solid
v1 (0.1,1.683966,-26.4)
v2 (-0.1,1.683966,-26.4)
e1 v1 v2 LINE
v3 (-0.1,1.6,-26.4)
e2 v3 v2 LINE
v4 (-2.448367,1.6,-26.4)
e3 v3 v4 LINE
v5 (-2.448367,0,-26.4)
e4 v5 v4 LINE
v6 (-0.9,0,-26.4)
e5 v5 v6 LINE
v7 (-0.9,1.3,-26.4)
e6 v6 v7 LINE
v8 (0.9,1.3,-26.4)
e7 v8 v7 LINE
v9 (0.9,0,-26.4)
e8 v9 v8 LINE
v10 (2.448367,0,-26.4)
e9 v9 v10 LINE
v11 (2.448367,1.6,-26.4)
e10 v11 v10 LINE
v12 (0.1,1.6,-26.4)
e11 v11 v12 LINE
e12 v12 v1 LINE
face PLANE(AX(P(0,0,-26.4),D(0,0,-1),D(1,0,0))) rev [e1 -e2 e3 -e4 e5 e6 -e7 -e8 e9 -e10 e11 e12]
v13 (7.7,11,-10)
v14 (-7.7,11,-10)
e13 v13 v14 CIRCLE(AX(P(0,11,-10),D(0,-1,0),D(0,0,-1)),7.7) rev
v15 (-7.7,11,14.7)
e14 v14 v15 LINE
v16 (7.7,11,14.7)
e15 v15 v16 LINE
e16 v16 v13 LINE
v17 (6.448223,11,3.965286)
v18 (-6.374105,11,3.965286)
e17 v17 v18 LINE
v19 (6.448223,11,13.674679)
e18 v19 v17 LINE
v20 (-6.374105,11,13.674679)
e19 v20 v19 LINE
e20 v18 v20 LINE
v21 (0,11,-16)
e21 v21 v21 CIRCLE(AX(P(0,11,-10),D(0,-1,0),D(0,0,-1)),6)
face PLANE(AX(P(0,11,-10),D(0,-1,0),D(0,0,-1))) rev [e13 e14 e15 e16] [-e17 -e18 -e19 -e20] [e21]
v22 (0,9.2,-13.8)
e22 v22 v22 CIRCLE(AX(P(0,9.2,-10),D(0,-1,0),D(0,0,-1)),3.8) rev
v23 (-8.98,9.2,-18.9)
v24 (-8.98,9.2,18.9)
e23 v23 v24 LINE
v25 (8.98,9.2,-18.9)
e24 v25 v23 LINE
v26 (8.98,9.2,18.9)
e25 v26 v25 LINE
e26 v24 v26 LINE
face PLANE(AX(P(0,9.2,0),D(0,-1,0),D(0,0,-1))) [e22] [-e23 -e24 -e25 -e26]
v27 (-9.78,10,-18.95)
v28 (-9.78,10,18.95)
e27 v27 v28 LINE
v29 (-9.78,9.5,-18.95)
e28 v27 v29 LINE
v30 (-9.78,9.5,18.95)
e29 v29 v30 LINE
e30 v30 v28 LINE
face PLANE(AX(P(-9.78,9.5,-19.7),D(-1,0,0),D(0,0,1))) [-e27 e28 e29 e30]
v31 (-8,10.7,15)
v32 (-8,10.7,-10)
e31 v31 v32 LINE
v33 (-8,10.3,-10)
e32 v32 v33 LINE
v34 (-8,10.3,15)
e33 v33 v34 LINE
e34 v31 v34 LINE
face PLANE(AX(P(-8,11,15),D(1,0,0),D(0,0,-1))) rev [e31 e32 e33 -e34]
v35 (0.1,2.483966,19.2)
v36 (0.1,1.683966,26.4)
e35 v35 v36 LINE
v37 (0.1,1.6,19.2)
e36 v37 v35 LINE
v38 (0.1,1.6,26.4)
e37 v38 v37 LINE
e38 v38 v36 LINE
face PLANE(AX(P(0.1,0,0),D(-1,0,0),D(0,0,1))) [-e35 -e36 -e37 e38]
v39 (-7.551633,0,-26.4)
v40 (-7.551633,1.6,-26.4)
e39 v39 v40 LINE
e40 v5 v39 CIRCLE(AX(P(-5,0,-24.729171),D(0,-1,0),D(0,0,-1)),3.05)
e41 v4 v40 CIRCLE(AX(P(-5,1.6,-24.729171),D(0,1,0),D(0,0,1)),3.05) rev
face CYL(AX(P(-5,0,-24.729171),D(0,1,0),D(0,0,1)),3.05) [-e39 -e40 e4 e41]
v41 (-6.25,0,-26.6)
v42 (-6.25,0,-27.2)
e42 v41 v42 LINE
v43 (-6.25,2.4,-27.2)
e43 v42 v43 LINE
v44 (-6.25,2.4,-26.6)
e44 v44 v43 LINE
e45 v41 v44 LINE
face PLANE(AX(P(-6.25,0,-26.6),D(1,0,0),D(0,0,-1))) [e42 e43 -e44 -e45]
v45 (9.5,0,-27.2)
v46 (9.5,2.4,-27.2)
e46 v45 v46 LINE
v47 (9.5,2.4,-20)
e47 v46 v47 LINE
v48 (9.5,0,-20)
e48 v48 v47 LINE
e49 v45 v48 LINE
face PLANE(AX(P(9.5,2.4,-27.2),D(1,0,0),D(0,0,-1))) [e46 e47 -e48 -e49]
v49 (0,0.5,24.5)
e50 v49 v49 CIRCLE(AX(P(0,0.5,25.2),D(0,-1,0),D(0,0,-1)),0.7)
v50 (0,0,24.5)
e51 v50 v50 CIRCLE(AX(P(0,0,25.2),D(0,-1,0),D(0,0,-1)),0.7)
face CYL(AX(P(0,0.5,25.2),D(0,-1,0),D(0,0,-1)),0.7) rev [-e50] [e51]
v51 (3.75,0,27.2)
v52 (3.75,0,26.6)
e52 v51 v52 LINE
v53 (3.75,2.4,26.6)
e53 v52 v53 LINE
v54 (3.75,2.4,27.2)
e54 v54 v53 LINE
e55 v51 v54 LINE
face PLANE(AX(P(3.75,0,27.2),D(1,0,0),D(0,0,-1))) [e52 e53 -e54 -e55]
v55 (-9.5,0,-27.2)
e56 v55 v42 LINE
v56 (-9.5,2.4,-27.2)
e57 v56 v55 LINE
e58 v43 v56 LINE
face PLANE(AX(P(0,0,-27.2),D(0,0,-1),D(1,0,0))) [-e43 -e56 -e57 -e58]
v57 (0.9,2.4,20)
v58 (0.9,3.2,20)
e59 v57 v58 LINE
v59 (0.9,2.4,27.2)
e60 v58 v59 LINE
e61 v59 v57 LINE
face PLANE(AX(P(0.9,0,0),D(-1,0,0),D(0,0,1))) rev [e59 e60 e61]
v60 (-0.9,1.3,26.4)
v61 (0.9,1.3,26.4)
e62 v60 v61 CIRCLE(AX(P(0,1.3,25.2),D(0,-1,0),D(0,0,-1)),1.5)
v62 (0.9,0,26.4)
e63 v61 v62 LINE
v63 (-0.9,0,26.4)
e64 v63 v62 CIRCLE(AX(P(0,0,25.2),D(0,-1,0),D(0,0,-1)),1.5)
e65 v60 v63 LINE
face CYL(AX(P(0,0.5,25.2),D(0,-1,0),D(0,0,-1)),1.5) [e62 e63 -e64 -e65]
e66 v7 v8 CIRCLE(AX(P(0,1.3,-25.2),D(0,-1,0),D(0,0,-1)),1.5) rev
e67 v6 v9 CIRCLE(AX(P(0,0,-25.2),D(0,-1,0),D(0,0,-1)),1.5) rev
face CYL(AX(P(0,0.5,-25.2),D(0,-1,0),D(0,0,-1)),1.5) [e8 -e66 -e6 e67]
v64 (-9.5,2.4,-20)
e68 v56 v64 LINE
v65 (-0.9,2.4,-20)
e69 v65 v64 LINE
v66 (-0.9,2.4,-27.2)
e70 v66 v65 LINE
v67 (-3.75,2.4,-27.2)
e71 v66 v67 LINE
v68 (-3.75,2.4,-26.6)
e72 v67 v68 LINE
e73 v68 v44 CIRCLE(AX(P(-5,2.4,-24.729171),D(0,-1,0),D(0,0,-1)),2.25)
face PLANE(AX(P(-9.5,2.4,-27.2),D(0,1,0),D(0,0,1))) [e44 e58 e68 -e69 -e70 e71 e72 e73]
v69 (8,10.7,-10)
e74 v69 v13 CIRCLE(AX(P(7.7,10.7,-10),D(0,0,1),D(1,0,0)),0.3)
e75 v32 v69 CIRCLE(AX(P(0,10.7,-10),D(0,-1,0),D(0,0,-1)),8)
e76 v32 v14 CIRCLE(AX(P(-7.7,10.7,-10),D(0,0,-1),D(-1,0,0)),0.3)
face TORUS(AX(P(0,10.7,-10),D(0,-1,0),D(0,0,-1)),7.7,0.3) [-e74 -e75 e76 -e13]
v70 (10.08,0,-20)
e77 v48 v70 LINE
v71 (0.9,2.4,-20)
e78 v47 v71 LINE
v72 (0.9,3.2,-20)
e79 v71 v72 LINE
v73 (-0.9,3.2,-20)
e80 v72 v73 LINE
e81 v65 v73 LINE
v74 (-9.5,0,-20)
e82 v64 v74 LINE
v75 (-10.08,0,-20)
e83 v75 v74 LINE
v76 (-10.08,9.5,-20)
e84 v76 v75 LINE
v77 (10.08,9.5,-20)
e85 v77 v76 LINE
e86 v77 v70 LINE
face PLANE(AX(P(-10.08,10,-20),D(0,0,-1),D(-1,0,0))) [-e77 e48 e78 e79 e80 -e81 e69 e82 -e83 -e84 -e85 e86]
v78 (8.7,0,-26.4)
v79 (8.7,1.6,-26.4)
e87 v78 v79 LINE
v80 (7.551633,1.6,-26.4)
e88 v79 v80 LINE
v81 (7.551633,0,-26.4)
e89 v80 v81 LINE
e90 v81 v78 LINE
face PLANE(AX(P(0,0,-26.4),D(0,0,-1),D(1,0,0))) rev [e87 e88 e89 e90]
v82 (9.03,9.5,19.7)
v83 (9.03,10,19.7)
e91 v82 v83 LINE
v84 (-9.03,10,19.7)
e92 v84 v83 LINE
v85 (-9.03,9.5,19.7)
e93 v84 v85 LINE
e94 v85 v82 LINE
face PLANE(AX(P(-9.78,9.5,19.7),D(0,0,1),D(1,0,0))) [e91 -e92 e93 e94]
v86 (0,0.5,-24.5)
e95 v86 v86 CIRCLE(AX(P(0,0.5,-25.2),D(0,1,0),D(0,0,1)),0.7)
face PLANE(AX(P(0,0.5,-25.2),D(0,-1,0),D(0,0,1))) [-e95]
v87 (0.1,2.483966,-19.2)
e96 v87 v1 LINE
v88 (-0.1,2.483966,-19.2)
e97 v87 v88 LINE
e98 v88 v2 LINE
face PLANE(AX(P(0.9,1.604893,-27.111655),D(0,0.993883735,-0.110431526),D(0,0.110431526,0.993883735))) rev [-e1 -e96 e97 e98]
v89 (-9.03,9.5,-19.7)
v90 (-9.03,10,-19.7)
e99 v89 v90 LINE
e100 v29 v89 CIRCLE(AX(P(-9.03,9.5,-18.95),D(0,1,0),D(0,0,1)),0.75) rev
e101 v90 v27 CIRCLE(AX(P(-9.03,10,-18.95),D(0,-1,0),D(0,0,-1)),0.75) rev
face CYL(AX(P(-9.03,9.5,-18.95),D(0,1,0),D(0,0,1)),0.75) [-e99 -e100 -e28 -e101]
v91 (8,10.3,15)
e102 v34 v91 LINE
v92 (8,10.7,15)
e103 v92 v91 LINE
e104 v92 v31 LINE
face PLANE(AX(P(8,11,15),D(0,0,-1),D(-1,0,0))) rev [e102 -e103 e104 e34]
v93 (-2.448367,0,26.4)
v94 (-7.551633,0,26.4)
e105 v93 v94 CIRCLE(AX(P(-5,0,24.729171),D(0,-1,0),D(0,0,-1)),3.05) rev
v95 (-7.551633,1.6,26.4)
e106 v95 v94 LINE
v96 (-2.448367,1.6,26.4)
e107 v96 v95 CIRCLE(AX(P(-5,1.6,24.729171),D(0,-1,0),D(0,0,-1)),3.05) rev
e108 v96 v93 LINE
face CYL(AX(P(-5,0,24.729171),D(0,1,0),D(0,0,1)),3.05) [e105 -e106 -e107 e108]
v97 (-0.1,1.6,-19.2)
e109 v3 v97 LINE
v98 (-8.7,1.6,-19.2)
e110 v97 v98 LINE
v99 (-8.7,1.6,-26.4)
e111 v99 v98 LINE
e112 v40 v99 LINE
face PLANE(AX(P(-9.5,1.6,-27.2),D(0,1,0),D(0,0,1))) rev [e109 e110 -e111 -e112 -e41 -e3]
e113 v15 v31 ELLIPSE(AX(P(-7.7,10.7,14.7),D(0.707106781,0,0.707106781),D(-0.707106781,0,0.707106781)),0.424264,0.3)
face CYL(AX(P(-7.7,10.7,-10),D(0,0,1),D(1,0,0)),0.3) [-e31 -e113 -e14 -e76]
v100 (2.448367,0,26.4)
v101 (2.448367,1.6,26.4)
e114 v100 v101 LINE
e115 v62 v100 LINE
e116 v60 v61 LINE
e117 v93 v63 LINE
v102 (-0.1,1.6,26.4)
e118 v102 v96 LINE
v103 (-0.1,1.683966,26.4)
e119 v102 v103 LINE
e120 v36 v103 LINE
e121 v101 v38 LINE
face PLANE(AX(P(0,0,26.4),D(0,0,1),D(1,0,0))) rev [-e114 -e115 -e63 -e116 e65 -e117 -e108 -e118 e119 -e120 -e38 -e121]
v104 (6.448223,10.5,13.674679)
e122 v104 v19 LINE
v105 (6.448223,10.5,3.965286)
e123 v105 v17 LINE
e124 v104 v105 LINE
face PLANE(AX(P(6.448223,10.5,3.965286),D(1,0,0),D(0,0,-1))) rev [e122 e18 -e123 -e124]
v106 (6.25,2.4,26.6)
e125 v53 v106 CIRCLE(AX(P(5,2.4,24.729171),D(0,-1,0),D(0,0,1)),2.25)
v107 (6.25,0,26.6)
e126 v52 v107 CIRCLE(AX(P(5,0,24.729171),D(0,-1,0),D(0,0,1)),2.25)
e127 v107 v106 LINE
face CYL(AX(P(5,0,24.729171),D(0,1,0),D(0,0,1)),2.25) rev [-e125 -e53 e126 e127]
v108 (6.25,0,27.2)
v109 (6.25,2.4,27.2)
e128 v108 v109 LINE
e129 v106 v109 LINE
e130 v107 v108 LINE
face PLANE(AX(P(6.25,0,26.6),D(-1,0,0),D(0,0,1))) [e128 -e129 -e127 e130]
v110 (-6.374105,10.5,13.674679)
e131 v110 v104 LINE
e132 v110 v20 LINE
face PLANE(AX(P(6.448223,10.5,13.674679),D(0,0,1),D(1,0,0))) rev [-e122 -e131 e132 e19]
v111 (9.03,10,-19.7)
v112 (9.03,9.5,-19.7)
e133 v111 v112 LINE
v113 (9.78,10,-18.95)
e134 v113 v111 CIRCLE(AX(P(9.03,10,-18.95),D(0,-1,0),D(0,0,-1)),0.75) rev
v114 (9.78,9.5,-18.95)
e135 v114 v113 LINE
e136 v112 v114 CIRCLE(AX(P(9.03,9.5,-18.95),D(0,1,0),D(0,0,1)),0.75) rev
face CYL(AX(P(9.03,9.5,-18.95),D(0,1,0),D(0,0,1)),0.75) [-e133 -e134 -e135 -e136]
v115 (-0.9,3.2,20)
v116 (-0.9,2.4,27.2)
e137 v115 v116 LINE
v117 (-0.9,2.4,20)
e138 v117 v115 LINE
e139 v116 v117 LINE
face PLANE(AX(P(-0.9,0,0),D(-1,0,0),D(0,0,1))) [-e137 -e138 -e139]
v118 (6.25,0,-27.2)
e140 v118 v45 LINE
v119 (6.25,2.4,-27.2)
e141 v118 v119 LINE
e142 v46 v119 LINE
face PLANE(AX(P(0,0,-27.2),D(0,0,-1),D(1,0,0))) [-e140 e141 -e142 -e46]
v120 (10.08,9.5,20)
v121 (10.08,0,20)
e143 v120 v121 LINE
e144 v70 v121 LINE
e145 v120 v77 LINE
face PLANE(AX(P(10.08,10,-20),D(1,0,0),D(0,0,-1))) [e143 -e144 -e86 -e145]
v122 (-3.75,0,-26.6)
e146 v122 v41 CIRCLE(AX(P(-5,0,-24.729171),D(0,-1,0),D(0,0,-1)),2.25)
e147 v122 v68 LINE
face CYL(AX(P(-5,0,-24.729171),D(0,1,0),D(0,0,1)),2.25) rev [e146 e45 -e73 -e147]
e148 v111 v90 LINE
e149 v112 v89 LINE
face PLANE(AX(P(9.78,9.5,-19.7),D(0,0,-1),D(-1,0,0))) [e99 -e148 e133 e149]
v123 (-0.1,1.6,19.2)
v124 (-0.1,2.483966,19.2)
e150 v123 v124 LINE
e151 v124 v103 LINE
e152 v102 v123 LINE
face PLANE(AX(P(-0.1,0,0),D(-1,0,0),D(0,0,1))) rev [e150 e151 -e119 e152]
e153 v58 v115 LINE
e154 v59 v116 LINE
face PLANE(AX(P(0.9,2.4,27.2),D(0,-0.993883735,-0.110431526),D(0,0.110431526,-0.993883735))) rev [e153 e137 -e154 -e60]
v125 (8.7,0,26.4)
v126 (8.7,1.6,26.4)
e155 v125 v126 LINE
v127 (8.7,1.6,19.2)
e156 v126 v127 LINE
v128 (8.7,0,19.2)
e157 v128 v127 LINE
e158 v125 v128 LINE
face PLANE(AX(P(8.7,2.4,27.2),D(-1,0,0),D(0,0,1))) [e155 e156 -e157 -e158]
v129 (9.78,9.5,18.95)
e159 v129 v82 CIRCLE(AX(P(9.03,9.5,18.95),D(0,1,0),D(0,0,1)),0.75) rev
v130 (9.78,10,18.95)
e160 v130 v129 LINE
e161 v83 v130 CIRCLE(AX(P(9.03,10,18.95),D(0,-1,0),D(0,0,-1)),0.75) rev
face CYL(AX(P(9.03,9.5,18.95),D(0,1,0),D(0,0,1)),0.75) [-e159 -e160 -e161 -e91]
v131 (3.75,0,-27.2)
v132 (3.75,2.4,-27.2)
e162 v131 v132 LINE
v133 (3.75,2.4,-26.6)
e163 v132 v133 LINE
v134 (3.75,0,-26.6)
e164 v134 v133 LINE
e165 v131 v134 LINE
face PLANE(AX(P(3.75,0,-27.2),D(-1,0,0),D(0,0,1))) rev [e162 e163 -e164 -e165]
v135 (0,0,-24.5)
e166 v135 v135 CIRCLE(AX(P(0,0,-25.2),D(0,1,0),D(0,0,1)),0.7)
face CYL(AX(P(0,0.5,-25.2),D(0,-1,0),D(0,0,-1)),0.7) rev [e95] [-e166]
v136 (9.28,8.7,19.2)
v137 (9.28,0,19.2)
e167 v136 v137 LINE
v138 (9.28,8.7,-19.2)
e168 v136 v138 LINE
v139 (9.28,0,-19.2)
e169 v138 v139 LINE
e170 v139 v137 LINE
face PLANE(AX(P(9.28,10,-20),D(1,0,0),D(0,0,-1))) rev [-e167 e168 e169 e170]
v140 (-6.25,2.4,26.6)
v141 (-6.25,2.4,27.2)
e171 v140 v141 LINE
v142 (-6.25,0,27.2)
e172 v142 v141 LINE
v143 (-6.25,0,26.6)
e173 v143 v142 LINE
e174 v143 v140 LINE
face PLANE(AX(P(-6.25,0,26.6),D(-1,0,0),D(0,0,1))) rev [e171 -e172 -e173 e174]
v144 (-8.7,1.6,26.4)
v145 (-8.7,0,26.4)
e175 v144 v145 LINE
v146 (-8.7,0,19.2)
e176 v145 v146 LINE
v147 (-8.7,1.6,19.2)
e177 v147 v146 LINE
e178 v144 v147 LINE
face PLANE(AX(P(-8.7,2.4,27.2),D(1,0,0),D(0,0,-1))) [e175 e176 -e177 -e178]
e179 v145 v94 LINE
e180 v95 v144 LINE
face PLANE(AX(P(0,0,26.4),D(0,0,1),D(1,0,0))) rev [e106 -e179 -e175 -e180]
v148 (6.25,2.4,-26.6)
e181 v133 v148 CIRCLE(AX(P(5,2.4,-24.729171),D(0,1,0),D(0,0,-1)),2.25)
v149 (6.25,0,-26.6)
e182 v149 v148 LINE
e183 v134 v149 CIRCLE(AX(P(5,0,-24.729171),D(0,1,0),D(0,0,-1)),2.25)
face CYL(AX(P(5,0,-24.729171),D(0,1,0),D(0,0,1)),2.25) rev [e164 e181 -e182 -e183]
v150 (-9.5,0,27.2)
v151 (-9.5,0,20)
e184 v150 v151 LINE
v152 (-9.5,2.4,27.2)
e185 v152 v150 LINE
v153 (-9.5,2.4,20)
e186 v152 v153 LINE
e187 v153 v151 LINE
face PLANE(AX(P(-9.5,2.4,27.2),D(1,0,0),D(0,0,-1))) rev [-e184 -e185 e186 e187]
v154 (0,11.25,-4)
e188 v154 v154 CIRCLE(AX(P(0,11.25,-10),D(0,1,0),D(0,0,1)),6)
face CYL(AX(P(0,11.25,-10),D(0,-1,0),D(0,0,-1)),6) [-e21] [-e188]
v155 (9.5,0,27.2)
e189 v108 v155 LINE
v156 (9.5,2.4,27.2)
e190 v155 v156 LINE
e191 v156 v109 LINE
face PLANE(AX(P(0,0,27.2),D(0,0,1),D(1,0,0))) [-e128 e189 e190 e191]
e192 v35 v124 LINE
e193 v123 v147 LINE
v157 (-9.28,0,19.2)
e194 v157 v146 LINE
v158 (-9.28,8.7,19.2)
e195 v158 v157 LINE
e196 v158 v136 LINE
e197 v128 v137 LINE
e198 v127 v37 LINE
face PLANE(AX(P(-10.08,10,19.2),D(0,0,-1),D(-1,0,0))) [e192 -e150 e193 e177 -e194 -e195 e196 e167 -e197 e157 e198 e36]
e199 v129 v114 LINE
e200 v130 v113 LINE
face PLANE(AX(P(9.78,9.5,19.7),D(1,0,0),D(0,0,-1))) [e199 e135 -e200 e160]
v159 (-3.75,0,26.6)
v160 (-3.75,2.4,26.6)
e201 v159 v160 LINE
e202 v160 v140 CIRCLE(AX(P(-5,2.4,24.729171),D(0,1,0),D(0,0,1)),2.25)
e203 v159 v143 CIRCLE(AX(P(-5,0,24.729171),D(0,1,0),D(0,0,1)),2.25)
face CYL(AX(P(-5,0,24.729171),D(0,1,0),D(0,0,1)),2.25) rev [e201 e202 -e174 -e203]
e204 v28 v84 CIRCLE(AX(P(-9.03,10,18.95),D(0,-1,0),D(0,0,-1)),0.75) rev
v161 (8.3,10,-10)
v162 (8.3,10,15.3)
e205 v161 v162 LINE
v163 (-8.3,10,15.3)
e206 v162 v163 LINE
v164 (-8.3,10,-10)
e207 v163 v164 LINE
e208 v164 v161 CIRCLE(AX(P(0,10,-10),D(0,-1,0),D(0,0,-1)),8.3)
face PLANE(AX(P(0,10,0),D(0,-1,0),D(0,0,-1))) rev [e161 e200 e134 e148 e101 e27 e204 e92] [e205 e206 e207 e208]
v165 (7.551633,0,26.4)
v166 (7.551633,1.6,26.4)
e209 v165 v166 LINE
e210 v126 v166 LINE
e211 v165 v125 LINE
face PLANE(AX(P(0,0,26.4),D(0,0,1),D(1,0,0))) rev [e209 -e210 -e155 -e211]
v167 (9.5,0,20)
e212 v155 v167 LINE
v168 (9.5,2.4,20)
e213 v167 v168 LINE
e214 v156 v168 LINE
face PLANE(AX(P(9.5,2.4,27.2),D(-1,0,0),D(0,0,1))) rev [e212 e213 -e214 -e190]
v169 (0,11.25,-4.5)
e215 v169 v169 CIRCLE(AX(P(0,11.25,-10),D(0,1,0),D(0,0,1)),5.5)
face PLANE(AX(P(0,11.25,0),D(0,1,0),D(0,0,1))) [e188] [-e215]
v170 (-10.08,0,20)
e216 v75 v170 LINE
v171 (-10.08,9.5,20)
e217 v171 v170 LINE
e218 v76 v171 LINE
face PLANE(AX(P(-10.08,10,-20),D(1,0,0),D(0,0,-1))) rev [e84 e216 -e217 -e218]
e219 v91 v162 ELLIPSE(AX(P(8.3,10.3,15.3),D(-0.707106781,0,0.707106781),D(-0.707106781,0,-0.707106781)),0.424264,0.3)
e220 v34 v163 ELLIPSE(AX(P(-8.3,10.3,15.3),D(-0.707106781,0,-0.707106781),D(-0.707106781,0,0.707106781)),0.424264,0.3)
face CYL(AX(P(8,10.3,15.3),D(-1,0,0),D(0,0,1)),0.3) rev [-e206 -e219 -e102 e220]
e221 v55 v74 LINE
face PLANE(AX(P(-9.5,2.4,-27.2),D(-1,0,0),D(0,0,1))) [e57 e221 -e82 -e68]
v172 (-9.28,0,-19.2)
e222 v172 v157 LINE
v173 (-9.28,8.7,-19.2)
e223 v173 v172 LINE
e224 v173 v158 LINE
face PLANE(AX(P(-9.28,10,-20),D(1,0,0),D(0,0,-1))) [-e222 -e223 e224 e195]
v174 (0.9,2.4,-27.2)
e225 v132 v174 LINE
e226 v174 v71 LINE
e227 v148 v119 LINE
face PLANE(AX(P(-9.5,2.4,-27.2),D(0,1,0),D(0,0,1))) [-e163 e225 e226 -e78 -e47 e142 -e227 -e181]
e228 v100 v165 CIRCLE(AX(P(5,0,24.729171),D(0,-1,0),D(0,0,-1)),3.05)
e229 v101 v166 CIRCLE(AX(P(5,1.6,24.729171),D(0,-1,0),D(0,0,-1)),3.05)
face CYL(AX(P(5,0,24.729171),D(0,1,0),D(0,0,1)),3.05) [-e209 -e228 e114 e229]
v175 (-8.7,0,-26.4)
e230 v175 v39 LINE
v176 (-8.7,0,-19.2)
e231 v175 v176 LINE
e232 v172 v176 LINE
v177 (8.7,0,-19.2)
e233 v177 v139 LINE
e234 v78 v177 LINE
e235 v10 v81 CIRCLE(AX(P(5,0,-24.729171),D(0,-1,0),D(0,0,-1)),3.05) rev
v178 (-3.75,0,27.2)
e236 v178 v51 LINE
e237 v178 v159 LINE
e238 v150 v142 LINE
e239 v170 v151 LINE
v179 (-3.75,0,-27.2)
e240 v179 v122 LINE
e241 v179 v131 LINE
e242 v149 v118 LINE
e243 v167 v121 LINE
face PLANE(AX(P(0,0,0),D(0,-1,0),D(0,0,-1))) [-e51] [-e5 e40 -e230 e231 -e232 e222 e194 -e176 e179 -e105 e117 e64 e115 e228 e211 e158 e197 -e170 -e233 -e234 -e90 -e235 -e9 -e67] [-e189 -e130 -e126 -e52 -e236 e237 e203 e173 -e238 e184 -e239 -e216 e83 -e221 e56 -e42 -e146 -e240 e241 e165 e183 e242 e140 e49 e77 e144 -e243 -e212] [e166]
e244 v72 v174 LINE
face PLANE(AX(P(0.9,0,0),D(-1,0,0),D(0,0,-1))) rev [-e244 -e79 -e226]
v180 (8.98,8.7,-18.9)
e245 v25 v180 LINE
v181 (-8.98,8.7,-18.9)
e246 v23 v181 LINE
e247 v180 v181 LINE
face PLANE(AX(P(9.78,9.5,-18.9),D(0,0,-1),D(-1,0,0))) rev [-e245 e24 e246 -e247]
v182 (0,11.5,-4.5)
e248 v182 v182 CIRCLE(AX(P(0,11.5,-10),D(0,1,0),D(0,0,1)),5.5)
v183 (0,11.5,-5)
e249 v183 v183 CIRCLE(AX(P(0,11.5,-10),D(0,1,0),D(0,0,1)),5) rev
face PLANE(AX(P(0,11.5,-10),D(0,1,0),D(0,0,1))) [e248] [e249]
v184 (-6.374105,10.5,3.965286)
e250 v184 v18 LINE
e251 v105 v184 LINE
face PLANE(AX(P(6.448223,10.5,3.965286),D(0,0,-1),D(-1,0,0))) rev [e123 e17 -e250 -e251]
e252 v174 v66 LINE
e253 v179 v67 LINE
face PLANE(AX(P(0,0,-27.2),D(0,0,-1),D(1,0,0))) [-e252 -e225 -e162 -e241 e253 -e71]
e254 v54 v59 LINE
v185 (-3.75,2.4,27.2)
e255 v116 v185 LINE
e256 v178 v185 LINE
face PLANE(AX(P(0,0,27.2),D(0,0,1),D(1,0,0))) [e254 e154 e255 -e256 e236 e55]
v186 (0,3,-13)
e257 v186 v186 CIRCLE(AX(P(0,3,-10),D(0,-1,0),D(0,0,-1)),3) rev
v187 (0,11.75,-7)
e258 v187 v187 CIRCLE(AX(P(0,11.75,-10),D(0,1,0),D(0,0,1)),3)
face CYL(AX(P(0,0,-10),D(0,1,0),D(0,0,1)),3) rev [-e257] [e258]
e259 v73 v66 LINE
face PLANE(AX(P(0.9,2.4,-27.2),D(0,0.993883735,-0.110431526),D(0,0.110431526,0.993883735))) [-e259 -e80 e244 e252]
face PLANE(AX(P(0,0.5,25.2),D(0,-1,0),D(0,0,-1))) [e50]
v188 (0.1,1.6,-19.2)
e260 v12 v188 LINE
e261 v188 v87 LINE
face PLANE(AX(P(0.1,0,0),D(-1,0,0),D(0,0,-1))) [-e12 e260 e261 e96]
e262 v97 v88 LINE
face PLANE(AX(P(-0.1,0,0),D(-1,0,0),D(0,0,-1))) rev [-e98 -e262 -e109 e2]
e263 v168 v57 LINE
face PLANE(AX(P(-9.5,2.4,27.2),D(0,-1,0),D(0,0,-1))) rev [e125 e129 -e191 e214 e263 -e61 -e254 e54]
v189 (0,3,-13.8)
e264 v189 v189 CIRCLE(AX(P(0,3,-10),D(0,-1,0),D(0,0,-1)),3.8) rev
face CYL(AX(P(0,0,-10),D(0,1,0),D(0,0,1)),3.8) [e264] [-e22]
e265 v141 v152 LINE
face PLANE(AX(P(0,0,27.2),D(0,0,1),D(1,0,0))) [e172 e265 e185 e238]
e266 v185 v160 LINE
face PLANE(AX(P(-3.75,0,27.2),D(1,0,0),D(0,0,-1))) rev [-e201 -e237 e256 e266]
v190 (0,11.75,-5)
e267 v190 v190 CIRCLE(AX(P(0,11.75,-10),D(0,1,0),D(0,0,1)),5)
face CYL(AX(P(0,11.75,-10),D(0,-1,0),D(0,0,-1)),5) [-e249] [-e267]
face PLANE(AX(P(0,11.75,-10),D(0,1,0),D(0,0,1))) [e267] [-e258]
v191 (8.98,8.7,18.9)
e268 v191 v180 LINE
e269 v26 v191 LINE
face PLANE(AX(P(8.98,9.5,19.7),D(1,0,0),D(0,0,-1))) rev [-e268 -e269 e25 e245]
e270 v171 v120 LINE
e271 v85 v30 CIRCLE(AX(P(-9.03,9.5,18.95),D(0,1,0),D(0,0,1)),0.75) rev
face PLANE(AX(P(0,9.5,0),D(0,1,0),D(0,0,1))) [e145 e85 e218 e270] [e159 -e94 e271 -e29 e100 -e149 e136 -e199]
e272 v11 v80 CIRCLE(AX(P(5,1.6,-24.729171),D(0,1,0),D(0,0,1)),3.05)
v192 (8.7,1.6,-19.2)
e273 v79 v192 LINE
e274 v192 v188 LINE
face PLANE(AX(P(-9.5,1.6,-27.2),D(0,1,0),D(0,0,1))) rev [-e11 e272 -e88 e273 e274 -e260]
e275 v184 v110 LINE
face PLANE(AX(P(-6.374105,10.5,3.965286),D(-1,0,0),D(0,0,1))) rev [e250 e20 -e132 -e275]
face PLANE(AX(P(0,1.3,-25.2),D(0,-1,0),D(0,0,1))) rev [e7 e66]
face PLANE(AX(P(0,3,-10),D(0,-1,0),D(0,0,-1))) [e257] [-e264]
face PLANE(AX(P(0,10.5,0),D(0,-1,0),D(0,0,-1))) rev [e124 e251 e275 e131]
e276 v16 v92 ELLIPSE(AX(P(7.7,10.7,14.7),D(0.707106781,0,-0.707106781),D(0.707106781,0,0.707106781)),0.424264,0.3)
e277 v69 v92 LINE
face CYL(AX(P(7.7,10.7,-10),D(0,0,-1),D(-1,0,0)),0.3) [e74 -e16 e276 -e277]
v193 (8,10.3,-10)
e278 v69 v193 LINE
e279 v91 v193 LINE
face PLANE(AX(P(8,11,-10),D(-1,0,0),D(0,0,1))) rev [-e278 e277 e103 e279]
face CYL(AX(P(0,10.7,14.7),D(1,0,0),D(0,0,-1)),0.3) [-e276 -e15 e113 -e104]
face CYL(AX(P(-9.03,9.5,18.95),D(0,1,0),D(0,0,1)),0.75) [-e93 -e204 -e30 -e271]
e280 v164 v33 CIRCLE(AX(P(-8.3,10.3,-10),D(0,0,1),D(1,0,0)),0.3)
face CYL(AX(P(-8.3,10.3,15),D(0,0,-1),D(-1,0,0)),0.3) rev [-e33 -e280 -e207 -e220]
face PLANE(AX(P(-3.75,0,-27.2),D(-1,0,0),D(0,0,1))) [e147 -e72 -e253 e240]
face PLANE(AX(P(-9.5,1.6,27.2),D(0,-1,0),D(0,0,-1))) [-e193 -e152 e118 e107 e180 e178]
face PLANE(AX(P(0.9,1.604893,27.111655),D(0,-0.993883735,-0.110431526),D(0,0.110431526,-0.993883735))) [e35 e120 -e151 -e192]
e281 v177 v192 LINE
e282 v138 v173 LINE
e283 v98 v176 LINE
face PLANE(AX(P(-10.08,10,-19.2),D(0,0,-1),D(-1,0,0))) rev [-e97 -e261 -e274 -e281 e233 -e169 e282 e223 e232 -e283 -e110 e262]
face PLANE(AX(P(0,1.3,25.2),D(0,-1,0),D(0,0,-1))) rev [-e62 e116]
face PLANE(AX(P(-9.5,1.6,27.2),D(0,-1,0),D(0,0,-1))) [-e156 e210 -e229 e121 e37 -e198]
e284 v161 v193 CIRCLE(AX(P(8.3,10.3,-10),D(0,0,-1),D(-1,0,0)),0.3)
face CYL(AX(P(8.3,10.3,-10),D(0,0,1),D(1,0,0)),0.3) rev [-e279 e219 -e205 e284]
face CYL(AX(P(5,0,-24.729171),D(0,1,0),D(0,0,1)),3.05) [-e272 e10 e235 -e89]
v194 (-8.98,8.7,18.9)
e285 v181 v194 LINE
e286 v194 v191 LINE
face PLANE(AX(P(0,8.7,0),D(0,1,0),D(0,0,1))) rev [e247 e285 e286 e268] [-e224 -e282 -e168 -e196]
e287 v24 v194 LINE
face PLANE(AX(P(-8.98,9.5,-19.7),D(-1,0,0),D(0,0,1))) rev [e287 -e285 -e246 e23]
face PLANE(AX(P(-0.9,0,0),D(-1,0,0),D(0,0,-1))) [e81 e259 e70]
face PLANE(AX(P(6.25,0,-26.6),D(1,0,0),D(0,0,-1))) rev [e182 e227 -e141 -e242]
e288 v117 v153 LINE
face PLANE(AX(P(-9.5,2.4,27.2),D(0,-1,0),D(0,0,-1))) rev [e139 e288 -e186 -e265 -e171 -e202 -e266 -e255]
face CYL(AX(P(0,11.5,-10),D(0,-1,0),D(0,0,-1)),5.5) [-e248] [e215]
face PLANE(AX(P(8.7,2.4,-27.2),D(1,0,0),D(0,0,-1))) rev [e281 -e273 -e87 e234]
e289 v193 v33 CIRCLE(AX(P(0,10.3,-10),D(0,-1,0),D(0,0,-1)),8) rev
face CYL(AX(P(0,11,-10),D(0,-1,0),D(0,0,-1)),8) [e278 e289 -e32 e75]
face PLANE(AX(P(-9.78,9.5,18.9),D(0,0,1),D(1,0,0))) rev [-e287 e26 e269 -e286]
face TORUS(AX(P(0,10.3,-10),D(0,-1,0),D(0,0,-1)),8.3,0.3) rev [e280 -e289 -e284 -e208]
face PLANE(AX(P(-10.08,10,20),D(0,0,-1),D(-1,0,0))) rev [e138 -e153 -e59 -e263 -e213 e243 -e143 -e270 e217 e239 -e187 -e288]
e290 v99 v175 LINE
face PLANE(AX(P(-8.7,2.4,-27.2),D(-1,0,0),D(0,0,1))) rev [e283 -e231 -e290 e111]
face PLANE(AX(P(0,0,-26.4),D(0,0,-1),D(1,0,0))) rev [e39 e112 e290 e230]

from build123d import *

# Parameters (mm, degrees)
BASES_W                              = 20.16
BASES_H                              = 40
BASE_DEPTH                           = 10
SHAFTHOLES_R                         = 3
SHAFT_HOLE_DEPTH                     = 25.527666012
MOUNTINGTABS_W                       = 19
MOUNTINGTABS_H                       = 2.4
MOUNTING_TAB_DEPTH                   = 7.2
MOUNTING_HOLE_DEPTH                  = 30.986770416
BOTTOMALIGNHOLES_R                   = 0.7
BOTTOM_ALIGN_HOLE_DEPTH              = 0.5
TRIANGULAR_TAB_DEPTH                 = 0.9
MOUNTING_TAB_FEATURES_M_COPY_1_DEPTH = 30.986770416
BORDERCUTS_W                         = 20.16
BORDERCUTS_H                         = 40
BORDERCUTS_W_2                       = 19.56
BORDERCUTS_H_2                       = 39.4
BORDER_CUT_DEPTH                     = 0.5
BORDER_CUT_F_R                       = 0.75
SHELL3_OUTLINE_W                     = 17.96
SHELL3_OUTLINE_H                     = 37.8
SHELL3_OUTLINE_R                     = 3.8
SHELL3_DEPTH                         = 9.2
SHELL3_2_OUTLINE_W                   = 18.56
SHELL3_2_OUTLINE_H                   = 38.4
SHELL3_2_OUTLINE_W_2                 = 17.96
SHELL3_2_OUTLINE_H_2                 = 37.8
SHELL3_2_DEPTH                       = 8.7
SHELL3_3_DEPTH                       = 1.6
SHELL3_START                         = 1.3
SHELL3_4_DEPTH                       = 0.3
SHELL3_START_2                       = 1.6
SHELL3_5_OUTLINE_W                   = 0.2
SHELL3_5_OUTLINE_H                   = 7.2
SHELL3_5_DEPTH                       = 0.083965765
SHELL3_START_3                       = -0.1
SHELL3_6_DEPTH                       = 0.2
SKETCH2_R                            = 4.5
CUT_EXTRUDE1_DEPTH                   = 3
SKETCH3_R                            = 6
SKETCH3_R_2                          = 5.5
BOSS_EXTRUDE1_DEPTH                  = 1.25
SKETCH3_4_R                          = 5.5
BOSS_EXTRUDE2_DEPTH                  = 1.5
SKETCH3_5_R                          = 5
BOSS_EXTRUDE3_DEPTH                  = 1.75
CUT_EXTRUDE7_DEPTH                   = 31.68299855
CUT_EXTRUDE7_DEPTH_BACK              = 31.68299855
SKETCH3_6_R                          = 3
BOSS_EXTRUDE4_DEPTH                  = 1
SKETCH6_R                            = 3
CUT_EXTRUDE8_DEPTH                   = 20
SKETCH7_W                            = 12.822327898
SKETCH7_H                            = 9.709392801
CUT_EXTRUDE9_DEPTH                   = 0.5
FILLET2_R                            = 0.3


with BuildPart() as part:
    # BaseS → BASE (new body)
    with BuildSketch(Plane(origin=(0, 0, 0), x_dir=(1, 0, 0), z_dir=(0, 1, 0))):
        Rectangle(BASES_W, BASES_H)
    extrude(amount=BASE_DEPTH)

    # ShaftHoleS → SHAFT HOLE (cut, through all)
    with BuildSketch(Plane(origin=(0, 10, 0), x_dir=(1, 0, 0), z_dir=(0, 1, 0))):
        with Locations(Location((0, 10, 0), (0, 0, 270))):
            Circle(SHAFTHOLES_R)
    extrude(amount=-SHAFT_HOLE_DEPTH, mode=Mode.SUBTRACT)

    # MountingTabS → MOUNTING TAB (add)
    with BuildSketch(Plane.XY.offset(20)):
        with Locations((0, 1.2)):
            Rectangle(MOUNTINGTABS_W, MOUNTINGTABS_H)
    mounting_tab = extrude(amount=MOUNTING_TAB_DEPTH)

    # MountingHoleS → MOUNTING HOLE (cut, through all)
    with BuildSketch(Plane(origin=(0, 2.4, 0), x_dir=(1, 0, 0), z_dir=(0, 1, 0))):
        with BuildLine():
            Line((-6.25, -26.6), (-6.25, -27.2))
            Line((-6.25, -27.2), (-3.75, -27.2))
            Line((-3.75, -27.2), (-3.75, -26.6))
            ThreePointArc((-3.75, -26.6), (-5, -22.479171307), (-6.25, -26.6))
        make_face()
    mounting_hole = extrude(amount=-MOUNTING_HOLE_DEPTH, mode=Mode.SUBTRACT)

    # MH M: MOUNTING HOLE across plane
    add(mounting_hole.mirror(Plane(origin=(0, 0, 0), x_dir=(0, 0, 1), z_dir=(1, 0, 0))), mode=Mode.SUBTRACT)

    # BottomAlignHoleS → BOTTOM ALIGN HOLE (cut)
    with BuildSketch(Plane.XZ):
        with Locations(Location((0, 25.2, 0), (0, 0, 270))):
            Circle(BOTTOMALIGNHOLES_R)
    bottom_align_hole = extrude(amount=-BOTTOM_ALIGN_HOLE_DEPTH, mode=Mode.SUBTRACT)

    # TriangularTabS → TRIANGULAR TAB (add, symmetric)
    with BuildSketch(Plane(origin=(0, 0, 0), x_dir=(0, 0, -1), z_dir=(1, 0, 0))):
        Polygon((-20, 2.4), (-27.2, 2.4), (-20, 3.2), align=None)
    triangular_tab = extrude(amount=TRIANGULAR_TAB_DEPTH, both=True)

    # MOUNTING TAB FEATURES M: MOUNTING TAB, MOUNTING HOLE, BOTTOM ALIGN HOLE, TRIANGULAR TAB across plane
    add(mounting_tab.mirror(Plane.XY))
    add(mounting_hole.mirror(Plane.XY), mode=Mode.SUBTRACT)
    add(bottom_align_hole.mirror(Plane.XY), mode=Mode.SUBTRACT)
    add(triangular_tab.mirror(Plane.XY))

    # MOUNTING TAB FEATURES M copy 1 sketch → MOUNTING TAB FEATURES M copy 1 (cut, through all)
    with BuildSketch(Plane(origin=(0, 2.4, 0), x_dir=(-1, 0, 0), z_dir=(0, 1, 0))):
        with BuildLine():
            Line((-6.25, -26.6), (-6.25, -27.2))
            Line((-6.25, -27.2), (-3.75, -27.2))
            Line((-3.75, -27.2), (-3.75, -26.6))
            ThreePointArc((-3.75, -26.6), (-5, -22.479171307), (-6.25, -26.6))
        make_face()
    extrude(amount=-MOUNTING_TAB_FEATURES_M_COPY_1_DEPTH, mode=Mode.SUBTRACT)

    # BorderCutS → BORDER CUT (cut)
    with BuildSketch(Plane(origin=(0, 10, 0), x_dir=(1, 0, 0), z_dir=(0, 1, 0))):
        Rectangle(BORDERCUTS_W, BORDERCUTS_H)
        Rectangle(BORDERCUTS_W_2, BORDERCUTS_H_2, mode=Mode.SUBTRACT)
    extrude(amount=-BORDER_CUT_DEPTH, mode=Mode.SUBTRACT)

    # BORDER CUT F
    border_cut_f_edges = [part.edges().sort_by_distance(p)[0] for p in [
        (9.78, 9.75, -19.7),
        (9.78, 9.75, 19.7),
        (-9.78, 9.75, 19.7),
        (-9.78, 9.75, -19.7),
    ]]
    fillet(border_cut_f_edges, radius=BORDER_CUT_F_R)

    # Shell3: read off the stored shape, not the designer's step
    # Shell3 outline → Shell3 (cut)
    with BuildSketch(Plane(origin=(0, 0, 0), x_dir=(1, 0, 0), z_dir=(0, 1, 0))):
        Rectangle(SHELL3_OUTLINE_W, SHELL3_OUTLINE_H)
        with Locations((0, 10)):
            Circle(SHELL3_OUTLINE_R, mode=Mode.SUBTRACT)
    extrude(amount=SHELL3_DEPTH, mode=Mode.SUBTRACT)

    # Shell3 2 outline → Shell3 2 (cut)
    with BuildSketch(Plane(origin=(0, 0, 0), x_dir=(1, 0, 0), z_dir=(0, 1, 0))):
        Rectangle(SHELL3_2_OUTLINE_W, SHELL3_2_OUTLINE_H)
        Rectangle(SHELL3_2_OUTLINE_W_2, SHELL3_2_OUTLINE_H_2, mode=Mode.SUBTRACT)
    extrude(amount=SHELL3_2_DEPTH, mode=Mode.SUBTRACT)

    # Shell3 3 outline → Shell3 3 (cut)
    with BuildSketch(Plane(origin=(0, 0, 0), x_dir=(1, 0, 0), z_dir=(0, 1, 0))):
        with BuildLine():
            Line((8.7, 19.2), (8.7, 26.4))
            Line((8.7, 26.4), (7.5516331, 26.4))
            ThreePointArc((7.5516331, 26.4), (5, 21.679171307), (2.4483669, 26.4))
            Line((2.4483669, 26.4), (0.9, 26.4))
            ThreePointArc((0.9, 26.4), (0, 23.7), (-0.9, 26.4))
            Line((-0.9, 26.4), (-2.4483669, 26.4))
            ThreePointArc((-2.4483669, 26.4), (-5, 21.679171307), (-7.5516331, 26.4))
            Line((-7.5516331, 26.4), (-8.7, 26.4))
            Line((-8.7, 26.4), (-8.7, 19.2))
            Line((-8.7, 19.2), (8.7, 19.2))
        make_face()
        with BuildLine():
            Line((8.7, -26.4), (8.7, -19.2))
            Line((8.7, -19.2), (-8.7, -19.2))
            Line((-8.7, -19.2), (-8.7, -26.4))
            Line((-8.7, -26.4), (-7.5516331, -26.4))
            ThreePointArc((-7.5516331, -26.4), (-5, -21.679171307), (-2.4483669, -26.4))
            Line((-2.4483669, -26.4), (-0.9, -26.4))
            ThreePointArc((-0.9, -26.4), (0, -23.7), (0.9, -26.4))
            Line((0.9, -26.4), (2.4483669, -26.4))
            ThreePointArc((2.4483669, -26.4), (5, -21.679171307), (7.5516331, -26.4))
            Line((7.5516331, -26.4), (8.7, -26.4))
        make_face()
    extrude(amount=SHELL3_3_DEPTH, mode=Mode.SUBTRACT)

    # Shell3 4 outline → Shell3 4 (cut)
    with BuildSketch(Plane(origin=(0, 0, 0), x_dir=(1, 0, 0), z_dir=(0, 1, 0)).offset(SHELL3_START)):
        with BuildLine():
            Line((0.9, 26.4), (-0.9, 26.4))
            ThreePointArc((-0.9, 26.4), (0, 23.7), (0.9, 26.4))
        make_face()
        with BuildLine():
            ThreePointArc((0.9, -26.4), (0, -23.7), (-0.9, -26.4))
            Line((-0.9, -26.4), (0.9, -26.4))
        make_face()
    extrude(amount=SHELL3_4_DEPTH, mode=Mode.SUBTRACT)

    # Shell3 5 outline → Shell3 5 (cut)
    with BuildSketch(Plane(origin=(0, 0, 0), x_dir=(1, 0, 0), z_dir=(0, 1, 0)).offset(SHELL3_START_2)):
        with Locations((0, 22.8)):
            Rectangle(SHELL3_5_OUTLINE_W, SHELL3_5_OUTLINE_H)
        with Locations((0, -22.8)):
            Rectangle(SHELL3_5_OUTLINE_W, SHELL3_5_OUTLINE_H)
    extrude(amount=SHELL3_5_DEPTH, mode=Mode.SUBTRACT)

    # Shell3 6 outline → Shell3 6 (cut)
    with BuildSketch(Plane.YZ.offset(SHELL3_START_3)):
        Polygon((2.483965765, 19.2), (1.683965765, 26.4), (1.683965765, 19.2), align=None)
        Polygon((1.683965765, -19.2), (1.683965765, -26.4), (2.483965765, -19.2), align=None)
    extrude(amount=SHELL3_6_DEPTH, mode=Mode.SUBTRACT)

    # Sketch2 → Cut-Extrude1 (cut)
    with BuildSketch(Plane(origin=(0, 0, 0), x_dir=(-1, 0, 0), z_dir=(0, -1, 0))):
        with Locations((0, 10)):
            Circle(SKETCH2_R)
    extrude(amount=-CUT_EXTRUDE1_DEPTH, mode=Mode.SUBTRACT)

    # Sketch3 → Boss-Extrude1 (add)
    with BuildSketch(Plane(origin=(0, 10, 0), x_dir=(1, 0, 0), z_dir=(0, 1, 0))):
        with Locations(Location((0, 10, 0), (0, 0, 90))):
            Circle(SKETCH3_R)
        with Locations(Location((0, 10, 0), (0, 0, 270))):
            Circle(SKETCH3_R_2, mode=Mode.SUBTRACT)
    extrude(amount=BOSS_EXTRUDE1_DEPTH)

    # Sketch3<4> → Boss-Extrude2 (add)
    with BuildSketch(Plane(origin=(0, 10, 0), x_dir=(1, 0, 0), z_dir=(0, 1, 0))):
        with Locations(Location((0, 10, 0), (0, 0, 270))):
            Circle(SKETCH3_4_R)
    extrude(amount=BOSS_EXTRUDE2_DEPTH)

    # Sketch3<5> → Boss-Extrude3 (add)
    with BuildSketch(Plane(origin=(0, 10, 0), x_dir=(1, 0, 0), z_dir=(0, 1, 0))):
        with Locations(Location((0, 10, 0), (0, 0, 270))):
            Circle(SKETCH3_5_R)
    extrude(amount=BOSS_EXTRUDE3_DEPTH)

    # Sketch3<6> → Cut-Extrude7 (cut, two sides: drawn at the far end of the back side and taken through both)
    with BuildSketch(Plane(origin=(0, 10, 0), x_dir=(1, 0, 0), z_dir=(0, 1, 0)).offset(-CUT_EXTRUDE7_DEPTH_BACK)):
        with Locations(Location((0, 10, 0), (0, 0, 270))):
            Circle(SKETCH3_6_R)
    extrude(amount=CUT_EXTRUDE7_DEPTH + CUT_EXTRUDE7_DEPTH_BACK, mode=Mode.SUBTRACT)

    # Sketch5 → Boss-Extrude4 (add)
    with BuildSketch(Plane(origin=(0, 10, 0), x_dir=(1, 0, 0), z_dir=(0, 1, 0))):
        with BuildLine():
            Line((8, 10), (8, -15))
            Line((8, -15), (-8, -15))
            Line((-8, -15), (-8, 10))
            ThreePointArc((-8, 10), (0, 18), (8, 10))
        make_face()
    extrude(amount=BOSS_EXTRUDE4_DEPTH)

    # Sketch6 → Cut-Extrude8 (cut)
    with BuildSketch(Plane(origin=(0, 11, 0), x_dir=(1, 0, 0), z_dir=(0, 1, 0))):
        with Locations(Location((0, 10, 0), (0, 0, 270))):
            Circle(SKETCH6_R)
    extrude(amount=-CUT_EXTRUDE8_DEPTH, mode=Mode.SUBTRACT)

    # Sketch7 → Cut-Extrude9 (cut)
    with BuildSketch(Plane(origin=(0, 11, 0), x_dir=(1, 0, 0), z_dir=(0, 1, 0))):
        with Locations((0.037058751, -8.819982774)):
            Rectangle(SKETCH7_W, SKETCH7_H)
    extrude(amount=-CUT_EXTRUDE9_DEPTH, mode=Mode.SUBTRACT)

    # Fillet2
    fillet2_edges = [part.edges().sort_by_distance(p)[0] for p in [
        (0, 10, -18),
        (-8, 10, 2.5),
        (0, 10, 15),
        (8, 10, 2.5),
        (0, 11, -18),
        (-8, 11, 2.5),
        (0, 11, 15),
        (8, 11, 2.5),
    ]]
    fillet(fillet2_edges, radius=FILLET2_R)


solid = part.part
